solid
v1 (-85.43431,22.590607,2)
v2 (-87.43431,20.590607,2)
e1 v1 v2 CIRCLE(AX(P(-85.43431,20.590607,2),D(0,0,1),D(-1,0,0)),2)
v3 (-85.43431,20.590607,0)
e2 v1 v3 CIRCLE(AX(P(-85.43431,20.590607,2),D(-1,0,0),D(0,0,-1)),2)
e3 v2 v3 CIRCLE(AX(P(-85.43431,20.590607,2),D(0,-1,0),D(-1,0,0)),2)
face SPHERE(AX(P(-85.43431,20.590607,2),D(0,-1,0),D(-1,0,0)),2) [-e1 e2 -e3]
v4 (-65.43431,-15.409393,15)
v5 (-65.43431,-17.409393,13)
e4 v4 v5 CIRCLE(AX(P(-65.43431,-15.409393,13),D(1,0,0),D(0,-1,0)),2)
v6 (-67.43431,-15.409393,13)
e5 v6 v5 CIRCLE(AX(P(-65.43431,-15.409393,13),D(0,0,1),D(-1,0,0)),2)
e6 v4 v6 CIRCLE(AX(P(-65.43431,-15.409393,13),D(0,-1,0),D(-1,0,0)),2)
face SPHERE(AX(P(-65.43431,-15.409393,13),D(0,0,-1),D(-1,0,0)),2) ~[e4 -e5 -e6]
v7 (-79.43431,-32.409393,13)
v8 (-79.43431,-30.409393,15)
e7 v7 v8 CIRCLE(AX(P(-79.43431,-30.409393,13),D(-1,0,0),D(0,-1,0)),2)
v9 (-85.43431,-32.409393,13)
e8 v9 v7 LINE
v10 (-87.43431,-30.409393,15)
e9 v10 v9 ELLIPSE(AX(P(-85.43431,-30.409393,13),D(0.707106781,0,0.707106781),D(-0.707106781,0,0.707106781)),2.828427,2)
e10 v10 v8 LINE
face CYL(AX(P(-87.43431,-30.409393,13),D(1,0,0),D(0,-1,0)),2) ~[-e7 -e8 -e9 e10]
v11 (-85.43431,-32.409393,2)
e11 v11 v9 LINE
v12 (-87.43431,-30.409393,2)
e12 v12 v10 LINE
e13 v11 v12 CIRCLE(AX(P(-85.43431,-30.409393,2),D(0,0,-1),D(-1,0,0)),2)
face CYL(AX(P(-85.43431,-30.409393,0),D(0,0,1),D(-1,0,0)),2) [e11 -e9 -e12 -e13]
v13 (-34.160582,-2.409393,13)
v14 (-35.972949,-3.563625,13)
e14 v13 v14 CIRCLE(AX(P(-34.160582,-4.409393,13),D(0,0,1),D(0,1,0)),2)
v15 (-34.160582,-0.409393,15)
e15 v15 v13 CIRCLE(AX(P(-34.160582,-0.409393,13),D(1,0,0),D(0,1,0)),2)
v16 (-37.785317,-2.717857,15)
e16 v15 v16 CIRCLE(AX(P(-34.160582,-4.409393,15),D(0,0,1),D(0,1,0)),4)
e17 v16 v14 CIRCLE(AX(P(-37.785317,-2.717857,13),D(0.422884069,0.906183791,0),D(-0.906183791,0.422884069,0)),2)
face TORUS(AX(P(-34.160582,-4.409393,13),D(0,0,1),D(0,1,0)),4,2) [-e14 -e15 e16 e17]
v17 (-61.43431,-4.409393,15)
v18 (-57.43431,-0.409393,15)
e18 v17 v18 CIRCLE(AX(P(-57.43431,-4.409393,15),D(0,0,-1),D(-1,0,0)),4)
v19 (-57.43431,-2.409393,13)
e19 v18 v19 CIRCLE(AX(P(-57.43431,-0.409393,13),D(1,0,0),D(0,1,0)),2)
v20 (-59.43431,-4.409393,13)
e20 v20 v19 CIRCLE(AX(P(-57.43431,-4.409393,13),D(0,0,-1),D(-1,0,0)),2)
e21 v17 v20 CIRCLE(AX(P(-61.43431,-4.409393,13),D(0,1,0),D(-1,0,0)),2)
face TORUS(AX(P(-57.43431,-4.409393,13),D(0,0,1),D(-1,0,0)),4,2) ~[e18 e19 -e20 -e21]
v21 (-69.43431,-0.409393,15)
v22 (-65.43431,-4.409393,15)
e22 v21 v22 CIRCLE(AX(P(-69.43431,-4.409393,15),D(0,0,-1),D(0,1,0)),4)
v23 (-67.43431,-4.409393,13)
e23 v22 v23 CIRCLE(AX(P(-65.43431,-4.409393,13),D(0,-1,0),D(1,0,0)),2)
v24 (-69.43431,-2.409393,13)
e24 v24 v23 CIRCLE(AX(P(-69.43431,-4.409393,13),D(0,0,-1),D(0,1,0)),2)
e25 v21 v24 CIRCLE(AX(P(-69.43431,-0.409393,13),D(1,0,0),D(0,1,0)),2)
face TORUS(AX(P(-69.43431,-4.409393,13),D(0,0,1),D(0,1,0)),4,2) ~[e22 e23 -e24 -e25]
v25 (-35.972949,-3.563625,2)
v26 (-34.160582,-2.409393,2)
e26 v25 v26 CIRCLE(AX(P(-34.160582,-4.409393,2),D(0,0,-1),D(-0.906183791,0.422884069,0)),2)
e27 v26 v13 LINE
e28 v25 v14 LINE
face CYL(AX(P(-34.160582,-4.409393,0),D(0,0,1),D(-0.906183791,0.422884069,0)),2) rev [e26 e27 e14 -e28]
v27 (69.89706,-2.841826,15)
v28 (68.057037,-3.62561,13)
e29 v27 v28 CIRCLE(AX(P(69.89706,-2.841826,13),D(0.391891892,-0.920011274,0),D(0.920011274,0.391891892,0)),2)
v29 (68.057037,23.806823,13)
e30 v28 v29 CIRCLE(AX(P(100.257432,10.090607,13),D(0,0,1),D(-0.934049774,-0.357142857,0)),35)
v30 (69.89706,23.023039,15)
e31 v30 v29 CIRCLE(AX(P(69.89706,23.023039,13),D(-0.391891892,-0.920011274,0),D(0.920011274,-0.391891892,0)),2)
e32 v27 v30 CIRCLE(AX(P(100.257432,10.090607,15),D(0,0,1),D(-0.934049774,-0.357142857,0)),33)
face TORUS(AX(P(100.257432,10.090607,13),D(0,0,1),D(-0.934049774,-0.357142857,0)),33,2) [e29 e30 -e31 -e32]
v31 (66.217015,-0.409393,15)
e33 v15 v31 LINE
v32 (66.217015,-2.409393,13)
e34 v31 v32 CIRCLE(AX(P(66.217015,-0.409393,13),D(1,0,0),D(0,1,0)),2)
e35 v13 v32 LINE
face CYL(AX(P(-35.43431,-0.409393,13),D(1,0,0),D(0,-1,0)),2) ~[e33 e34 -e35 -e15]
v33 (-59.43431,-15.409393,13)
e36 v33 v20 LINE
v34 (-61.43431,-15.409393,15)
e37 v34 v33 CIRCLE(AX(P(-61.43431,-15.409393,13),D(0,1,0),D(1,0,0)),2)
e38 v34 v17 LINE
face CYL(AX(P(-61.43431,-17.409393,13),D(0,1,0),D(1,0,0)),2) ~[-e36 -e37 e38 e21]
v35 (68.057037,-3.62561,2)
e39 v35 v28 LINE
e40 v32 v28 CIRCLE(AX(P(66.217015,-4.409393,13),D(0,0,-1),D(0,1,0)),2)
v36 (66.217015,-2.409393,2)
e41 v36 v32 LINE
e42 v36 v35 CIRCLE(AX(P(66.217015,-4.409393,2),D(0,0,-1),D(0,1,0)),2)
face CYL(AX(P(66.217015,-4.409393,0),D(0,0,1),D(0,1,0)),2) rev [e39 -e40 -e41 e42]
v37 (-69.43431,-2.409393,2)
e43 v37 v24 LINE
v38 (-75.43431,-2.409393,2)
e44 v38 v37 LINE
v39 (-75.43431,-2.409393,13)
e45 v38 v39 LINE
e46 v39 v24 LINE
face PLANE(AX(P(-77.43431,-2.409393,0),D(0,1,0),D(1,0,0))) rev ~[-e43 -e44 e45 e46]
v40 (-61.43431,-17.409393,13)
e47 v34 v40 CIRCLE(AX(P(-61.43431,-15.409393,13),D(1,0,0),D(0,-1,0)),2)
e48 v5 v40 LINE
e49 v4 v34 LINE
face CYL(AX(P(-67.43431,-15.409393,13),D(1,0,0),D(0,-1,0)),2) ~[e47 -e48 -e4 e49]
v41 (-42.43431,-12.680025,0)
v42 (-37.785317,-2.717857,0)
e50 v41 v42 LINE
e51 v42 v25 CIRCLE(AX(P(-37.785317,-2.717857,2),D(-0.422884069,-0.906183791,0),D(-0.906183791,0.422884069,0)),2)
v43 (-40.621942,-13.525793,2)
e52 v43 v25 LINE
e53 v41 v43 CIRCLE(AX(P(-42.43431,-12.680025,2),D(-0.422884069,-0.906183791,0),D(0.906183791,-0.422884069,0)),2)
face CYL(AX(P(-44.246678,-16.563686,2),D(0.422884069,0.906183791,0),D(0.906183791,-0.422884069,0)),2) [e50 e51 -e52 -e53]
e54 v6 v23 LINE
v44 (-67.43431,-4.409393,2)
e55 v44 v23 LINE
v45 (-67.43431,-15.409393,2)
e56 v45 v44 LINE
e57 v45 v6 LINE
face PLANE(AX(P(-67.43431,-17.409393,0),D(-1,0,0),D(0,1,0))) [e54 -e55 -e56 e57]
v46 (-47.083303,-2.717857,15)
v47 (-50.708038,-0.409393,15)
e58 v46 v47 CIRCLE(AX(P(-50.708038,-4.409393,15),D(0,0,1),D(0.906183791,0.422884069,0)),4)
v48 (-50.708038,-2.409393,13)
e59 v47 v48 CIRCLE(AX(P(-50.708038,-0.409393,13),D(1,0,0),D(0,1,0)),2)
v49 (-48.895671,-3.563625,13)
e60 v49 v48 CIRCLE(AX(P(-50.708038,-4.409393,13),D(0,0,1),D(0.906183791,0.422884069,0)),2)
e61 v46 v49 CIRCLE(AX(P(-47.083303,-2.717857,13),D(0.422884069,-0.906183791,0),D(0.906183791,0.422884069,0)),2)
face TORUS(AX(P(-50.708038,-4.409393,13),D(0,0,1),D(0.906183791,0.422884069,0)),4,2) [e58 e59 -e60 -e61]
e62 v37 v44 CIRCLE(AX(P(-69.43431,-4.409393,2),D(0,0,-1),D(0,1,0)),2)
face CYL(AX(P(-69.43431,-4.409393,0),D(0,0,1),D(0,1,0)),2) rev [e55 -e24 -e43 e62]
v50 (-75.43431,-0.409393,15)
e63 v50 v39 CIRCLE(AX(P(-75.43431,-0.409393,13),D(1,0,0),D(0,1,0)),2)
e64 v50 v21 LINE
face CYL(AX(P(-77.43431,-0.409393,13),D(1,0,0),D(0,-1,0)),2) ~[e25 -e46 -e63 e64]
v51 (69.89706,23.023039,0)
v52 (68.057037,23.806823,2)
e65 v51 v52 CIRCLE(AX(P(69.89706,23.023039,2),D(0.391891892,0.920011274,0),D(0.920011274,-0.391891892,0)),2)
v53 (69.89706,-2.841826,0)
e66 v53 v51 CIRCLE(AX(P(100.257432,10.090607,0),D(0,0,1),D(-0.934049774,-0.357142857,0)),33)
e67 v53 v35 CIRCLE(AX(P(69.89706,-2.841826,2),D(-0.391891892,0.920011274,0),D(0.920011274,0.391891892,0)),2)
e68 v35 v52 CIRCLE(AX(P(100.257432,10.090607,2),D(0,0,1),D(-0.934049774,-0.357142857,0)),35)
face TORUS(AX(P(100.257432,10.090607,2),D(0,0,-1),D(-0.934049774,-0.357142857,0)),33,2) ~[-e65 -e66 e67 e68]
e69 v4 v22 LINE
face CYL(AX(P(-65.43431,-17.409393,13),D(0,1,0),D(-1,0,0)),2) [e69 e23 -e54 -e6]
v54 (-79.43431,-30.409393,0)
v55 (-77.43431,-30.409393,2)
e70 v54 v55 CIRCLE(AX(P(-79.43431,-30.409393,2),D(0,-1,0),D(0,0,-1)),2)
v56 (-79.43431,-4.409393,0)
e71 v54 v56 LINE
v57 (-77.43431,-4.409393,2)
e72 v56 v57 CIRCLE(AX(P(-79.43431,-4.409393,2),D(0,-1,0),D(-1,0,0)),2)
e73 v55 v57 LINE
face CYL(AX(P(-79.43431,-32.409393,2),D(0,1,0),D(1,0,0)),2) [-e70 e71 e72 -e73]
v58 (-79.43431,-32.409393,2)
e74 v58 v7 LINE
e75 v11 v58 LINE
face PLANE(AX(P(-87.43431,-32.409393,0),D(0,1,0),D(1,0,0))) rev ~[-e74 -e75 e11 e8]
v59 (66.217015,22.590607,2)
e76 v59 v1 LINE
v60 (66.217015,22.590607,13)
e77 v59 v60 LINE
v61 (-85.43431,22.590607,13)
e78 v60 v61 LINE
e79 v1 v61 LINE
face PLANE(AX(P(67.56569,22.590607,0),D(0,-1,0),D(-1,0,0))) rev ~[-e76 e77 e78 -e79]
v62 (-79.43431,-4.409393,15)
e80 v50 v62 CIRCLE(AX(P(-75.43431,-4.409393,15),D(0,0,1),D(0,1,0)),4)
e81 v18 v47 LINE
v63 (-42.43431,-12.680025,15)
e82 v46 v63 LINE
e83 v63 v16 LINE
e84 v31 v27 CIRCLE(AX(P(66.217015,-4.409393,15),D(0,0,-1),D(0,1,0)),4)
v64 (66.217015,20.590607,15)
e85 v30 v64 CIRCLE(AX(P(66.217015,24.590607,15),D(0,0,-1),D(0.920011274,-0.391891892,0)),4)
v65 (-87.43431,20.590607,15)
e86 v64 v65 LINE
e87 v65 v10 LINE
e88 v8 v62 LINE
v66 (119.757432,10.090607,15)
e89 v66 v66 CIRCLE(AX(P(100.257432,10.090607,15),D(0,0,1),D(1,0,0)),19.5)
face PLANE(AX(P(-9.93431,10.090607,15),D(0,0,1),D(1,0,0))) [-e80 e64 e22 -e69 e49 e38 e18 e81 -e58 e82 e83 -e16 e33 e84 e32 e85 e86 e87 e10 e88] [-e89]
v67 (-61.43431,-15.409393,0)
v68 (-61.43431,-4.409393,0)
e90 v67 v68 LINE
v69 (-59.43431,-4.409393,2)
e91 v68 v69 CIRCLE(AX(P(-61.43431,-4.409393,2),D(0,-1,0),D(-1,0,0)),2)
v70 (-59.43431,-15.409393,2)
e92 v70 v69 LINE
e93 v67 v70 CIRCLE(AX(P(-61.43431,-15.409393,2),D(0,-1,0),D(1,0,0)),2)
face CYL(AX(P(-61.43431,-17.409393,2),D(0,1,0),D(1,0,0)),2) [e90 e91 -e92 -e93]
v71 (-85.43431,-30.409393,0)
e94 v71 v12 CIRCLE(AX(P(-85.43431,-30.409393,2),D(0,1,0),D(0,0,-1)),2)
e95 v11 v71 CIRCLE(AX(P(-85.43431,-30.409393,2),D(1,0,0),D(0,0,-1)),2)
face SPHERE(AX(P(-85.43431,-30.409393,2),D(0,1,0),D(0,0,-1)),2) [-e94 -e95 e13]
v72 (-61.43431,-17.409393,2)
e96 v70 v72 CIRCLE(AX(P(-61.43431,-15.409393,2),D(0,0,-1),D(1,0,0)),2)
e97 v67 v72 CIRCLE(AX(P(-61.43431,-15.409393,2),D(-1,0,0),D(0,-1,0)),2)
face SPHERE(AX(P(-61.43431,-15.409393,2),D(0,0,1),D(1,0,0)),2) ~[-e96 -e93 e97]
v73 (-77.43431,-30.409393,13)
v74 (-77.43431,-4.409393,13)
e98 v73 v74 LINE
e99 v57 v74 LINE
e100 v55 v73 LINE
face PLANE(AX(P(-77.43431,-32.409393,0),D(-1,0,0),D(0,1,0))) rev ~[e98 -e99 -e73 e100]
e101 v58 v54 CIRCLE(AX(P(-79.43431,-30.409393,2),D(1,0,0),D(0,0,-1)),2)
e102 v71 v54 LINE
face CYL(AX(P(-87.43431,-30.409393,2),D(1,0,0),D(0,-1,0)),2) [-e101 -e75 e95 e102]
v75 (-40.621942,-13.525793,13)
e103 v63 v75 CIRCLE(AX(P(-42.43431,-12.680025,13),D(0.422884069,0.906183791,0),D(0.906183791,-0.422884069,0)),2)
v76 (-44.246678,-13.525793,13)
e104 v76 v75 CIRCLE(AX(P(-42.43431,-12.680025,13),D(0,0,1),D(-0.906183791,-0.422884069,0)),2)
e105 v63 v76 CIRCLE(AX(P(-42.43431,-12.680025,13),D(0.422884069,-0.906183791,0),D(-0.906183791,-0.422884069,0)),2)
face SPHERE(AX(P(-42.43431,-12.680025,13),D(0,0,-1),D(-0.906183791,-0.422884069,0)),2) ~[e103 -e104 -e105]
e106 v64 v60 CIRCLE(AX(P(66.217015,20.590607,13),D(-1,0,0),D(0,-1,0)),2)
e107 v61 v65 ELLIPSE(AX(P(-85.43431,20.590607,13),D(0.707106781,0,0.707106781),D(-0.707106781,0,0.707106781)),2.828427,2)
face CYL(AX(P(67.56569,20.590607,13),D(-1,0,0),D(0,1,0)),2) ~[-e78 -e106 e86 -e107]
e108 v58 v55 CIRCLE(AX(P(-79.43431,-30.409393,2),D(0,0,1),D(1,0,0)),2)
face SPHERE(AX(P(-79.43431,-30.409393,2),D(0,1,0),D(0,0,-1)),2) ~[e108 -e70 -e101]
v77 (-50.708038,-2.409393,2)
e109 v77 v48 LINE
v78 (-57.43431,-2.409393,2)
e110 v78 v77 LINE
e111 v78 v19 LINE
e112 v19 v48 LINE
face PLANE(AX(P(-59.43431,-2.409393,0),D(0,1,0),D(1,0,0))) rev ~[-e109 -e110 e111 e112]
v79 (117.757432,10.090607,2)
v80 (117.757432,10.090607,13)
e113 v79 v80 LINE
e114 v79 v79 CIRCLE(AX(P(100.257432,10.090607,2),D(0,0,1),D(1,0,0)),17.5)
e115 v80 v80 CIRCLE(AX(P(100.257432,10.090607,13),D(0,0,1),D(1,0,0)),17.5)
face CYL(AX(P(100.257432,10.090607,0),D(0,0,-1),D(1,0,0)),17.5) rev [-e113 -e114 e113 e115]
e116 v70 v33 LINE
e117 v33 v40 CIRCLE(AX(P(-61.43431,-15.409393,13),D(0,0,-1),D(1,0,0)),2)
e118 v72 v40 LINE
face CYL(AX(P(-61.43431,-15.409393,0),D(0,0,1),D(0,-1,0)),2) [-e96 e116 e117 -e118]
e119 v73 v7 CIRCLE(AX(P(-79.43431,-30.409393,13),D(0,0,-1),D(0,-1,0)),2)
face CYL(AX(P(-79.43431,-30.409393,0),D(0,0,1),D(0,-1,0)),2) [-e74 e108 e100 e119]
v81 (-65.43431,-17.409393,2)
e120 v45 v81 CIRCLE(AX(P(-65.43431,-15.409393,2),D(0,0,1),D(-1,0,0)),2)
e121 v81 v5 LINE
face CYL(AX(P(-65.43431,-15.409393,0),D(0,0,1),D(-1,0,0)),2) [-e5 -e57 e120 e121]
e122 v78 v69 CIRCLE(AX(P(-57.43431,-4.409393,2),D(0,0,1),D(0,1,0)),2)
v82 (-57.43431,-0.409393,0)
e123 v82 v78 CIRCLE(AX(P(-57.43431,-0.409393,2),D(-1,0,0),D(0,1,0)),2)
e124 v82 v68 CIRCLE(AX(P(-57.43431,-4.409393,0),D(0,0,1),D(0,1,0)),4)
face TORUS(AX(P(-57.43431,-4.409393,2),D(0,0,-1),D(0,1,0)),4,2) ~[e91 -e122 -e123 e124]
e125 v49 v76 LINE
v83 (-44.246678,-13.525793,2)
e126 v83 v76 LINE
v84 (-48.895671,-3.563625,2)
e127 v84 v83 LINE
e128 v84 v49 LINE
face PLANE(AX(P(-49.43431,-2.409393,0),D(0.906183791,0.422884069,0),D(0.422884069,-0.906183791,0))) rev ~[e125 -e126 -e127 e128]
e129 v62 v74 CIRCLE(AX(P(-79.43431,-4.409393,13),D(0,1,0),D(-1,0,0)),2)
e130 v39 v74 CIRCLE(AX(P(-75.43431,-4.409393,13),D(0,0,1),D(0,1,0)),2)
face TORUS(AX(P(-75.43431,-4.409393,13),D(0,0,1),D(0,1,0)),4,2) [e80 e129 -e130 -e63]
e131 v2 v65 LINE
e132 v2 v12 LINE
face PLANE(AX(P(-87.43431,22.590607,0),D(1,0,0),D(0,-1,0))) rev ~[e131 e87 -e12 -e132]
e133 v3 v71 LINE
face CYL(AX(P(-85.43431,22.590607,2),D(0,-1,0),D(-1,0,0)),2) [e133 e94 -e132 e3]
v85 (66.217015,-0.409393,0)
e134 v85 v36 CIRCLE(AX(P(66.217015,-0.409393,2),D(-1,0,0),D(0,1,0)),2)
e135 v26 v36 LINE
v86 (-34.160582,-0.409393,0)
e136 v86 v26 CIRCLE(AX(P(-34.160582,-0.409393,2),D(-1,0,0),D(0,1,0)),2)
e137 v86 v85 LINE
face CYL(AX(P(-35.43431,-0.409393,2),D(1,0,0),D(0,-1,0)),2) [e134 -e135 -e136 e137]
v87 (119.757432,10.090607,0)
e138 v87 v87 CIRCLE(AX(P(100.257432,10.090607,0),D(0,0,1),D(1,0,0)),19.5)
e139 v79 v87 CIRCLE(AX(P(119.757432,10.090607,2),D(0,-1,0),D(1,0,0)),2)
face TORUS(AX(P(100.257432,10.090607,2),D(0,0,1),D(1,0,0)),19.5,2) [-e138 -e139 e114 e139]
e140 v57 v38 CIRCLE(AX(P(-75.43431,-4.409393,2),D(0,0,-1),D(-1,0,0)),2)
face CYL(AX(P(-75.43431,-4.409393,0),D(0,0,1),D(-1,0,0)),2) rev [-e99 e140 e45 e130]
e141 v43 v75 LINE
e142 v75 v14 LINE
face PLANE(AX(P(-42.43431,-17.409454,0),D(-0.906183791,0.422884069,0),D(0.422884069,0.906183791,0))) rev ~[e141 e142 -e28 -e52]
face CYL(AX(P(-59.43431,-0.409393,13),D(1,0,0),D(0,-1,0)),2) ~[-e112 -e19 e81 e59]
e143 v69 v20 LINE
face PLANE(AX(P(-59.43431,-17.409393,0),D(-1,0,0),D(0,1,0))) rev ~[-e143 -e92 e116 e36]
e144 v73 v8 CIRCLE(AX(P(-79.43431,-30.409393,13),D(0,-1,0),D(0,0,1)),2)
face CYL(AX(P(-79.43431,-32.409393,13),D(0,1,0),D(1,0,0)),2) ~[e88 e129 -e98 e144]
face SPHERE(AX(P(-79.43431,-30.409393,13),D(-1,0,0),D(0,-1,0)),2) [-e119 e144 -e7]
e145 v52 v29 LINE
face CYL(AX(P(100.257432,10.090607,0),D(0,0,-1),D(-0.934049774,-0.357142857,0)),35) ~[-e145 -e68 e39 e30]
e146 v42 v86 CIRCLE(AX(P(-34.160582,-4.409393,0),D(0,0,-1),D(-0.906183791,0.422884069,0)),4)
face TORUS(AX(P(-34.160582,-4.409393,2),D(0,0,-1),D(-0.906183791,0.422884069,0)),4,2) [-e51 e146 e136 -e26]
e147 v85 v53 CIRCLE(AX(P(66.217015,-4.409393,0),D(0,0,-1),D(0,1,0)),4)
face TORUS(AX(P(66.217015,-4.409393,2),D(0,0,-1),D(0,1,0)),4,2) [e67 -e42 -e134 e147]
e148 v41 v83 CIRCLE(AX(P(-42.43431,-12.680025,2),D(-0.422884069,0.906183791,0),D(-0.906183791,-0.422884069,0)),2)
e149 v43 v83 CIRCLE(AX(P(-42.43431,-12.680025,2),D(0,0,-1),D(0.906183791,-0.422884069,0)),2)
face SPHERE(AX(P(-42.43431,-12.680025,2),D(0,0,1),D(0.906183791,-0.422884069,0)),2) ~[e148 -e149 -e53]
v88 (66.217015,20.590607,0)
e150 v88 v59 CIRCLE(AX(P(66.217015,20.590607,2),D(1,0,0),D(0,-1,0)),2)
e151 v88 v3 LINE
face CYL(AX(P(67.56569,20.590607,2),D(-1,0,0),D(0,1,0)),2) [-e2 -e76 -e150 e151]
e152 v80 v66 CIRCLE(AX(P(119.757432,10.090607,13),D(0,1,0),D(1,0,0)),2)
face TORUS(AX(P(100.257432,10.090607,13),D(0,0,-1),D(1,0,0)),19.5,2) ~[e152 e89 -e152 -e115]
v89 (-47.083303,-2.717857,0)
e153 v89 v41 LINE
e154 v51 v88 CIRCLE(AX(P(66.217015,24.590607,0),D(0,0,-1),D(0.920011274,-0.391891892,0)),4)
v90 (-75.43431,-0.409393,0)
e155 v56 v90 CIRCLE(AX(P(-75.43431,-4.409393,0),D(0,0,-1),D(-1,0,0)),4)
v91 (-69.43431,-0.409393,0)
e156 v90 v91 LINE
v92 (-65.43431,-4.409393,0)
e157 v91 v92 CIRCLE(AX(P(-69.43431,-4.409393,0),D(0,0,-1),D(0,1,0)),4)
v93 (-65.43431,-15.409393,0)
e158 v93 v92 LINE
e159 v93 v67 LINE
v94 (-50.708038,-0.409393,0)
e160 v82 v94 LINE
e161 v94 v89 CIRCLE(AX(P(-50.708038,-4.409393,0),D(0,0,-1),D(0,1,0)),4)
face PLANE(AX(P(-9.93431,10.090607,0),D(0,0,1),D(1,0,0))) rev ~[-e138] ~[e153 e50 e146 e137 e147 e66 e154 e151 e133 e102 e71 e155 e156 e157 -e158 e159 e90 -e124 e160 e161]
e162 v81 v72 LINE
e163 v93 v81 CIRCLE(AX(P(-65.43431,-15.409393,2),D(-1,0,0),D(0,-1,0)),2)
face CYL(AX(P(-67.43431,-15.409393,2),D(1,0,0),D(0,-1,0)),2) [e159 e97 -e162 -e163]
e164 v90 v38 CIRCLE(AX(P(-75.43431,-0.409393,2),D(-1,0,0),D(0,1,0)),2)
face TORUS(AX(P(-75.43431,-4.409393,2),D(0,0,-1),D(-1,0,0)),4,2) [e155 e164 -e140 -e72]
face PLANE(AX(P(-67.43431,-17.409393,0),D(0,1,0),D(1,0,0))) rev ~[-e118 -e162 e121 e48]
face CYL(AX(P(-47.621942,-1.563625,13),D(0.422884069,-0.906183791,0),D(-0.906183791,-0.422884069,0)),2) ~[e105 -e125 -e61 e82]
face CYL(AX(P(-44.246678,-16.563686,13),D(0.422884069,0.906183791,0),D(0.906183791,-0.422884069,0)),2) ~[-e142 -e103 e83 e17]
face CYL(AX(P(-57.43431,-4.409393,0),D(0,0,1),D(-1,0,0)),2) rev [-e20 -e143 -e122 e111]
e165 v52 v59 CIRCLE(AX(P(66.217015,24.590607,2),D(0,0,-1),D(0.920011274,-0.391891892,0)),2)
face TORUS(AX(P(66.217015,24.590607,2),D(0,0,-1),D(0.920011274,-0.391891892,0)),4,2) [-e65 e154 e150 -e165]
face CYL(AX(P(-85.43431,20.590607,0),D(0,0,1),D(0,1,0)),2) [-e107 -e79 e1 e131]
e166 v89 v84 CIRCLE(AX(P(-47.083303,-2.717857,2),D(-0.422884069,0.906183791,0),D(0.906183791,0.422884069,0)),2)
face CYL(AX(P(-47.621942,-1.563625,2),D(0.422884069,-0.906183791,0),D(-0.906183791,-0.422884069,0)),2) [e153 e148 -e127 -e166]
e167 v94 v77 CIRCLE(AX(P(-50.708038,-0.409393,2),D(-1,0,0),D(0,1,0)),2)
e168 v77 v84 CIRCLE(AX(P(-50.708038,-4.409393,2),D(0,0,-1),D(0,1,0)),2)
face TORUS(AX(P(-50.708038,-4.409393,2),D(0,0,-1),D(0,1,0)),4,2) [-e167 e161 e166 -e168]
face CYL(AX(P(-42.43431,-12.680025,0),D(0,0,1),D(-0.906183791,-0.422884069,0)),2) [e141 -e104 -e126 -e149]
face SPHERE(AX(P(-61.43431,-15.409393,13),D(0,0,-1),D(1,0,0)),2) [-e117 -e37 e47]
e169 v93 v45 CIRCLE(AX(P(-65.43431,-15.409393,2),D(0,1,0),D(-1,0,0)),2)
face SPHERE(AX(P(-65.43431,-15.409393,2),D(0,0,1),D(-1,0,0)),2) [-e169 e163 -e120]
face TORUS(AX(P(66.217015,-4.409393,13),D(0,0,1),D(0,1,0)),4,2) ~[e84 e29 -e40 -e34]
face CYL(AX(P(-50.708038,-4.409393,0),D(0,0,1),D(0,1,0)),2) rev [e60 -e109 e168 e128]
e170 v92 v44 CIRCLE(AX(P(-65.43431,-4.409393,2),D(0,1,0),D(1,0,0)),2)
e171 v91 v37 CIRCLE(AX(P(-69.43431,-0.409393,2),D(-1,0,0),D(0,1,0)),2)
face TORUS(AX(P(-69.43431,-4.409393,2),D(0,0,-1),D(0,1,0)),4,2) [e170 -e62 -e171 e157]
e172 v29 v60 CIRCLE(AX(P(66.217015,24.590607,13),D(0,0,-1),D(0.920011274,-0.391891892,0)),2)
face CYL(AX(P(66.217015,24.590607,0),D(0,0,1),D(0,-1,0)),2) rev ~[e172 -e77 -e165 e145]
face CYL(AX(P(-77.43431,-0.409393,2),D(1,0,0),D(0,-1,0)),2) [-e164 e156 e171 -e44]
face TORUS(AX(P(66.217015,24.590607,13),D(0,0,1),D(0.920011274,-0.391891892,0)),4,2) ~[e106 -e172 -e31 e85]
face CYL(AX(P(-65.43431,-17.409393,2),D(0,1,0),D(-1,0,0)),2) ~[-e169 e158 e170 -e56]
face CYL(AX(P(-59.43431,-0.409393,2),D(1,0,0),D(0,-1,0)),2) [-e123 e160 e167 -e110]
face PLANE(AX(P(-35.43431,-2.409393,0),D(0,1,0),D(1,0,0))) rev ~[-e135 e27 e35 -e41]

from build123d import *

# Parameters (mm, degrees)
F0_R     = 17.5
F0_W     = 10
F0_H     = 30
F0_W_2   = 8
F0_H_2   = 15
F1_DEPTH = 15
F2_R     = 2


with BuildPart() as f1:
    # F0 (on Top) → F1 (new body)
    with BuildSketch(Plane.XY):
        Polygon((67.5656899738, 22.5906066601), (-87.4343100262, 22.5906066601), (-87.4343100262, -2.4093933399), (-77.4343100262, -2.4093933399), (-67.4343100262, -2.4093933399), (-59.4343100262, -2.4093933399), (-49.4343100262, -2.4093933399), (-35.4343100262, -2.4093933399), (67.5656899738, -2.4093933399), align=None)
        with BuildLine():
            ThreePointArc((67.5656899738, -2.4093933399), (135.2574320504, 10.0906066601), (67.5656899738, 22.5906066601))
            Line((67.5656899738, 22.5906066601), (67.5656899738, -2.4093933399))
        make_face()
        with Locations((100.2574320504, 10.0906066601)):
            Circle(F0_R, mode=Mode.SUBTRACT)
        with Locations((-82.4343100262, -17.4093933399)):
            Rectangle(F0_W, F0_H)
        Polygon((-42.4343100262, -17.4094536398), (-35.4343100262, -2.4093933399), (-49.4343100262, -2.4093933399), align=None)
        with Locations((-63.4343100262, -9.9093933399)):
            Rectangle(F0_W_2, F0_H_2)
    extrude(amount=F1_DEPTH)

    # F2
    f2_edges = [f1.edges().sort_by_distance(p)[0] for p in [
        (-35.43431, -2.409393, 7.5),
        (-45.93431, -9.909423, 0),
        (-59.43431, -17.409393, 7.5),
        (-49.43431, -2.409393, 7.5),
        (-67.43431, -17.409393, 7.5),
        (-42.43431, -17.409454, 7.5),
        (-45.93431, -9.909423, 15),
        (-38.93431, -9.909423, 0),
        (-87.43431, -4.909393, 0),
        (135.257432, 10.090607, 0),
        (135.257432, 10.090607, 15),
        (82.757432, 10.090607, 0),
        (82.757432, 10.090607, 15),
        (-77.43431, -17.409393, 0),
        (-87.43431, 22.590607, 7.5),
        (-72.43431, -2.409393, 0),
        (-59.43431, -2.409393, 7.5),
        (67.56569, -2.409393, 7.5),
        (-54.43431, -2.409393, 0),
        (-9.93431, 22.590607, 0),
        (-9.93431, 22.590607, 15),
        (67.56569, 22.590607, 7.5),
        (-77.43431, -2.409393, 7.5),
        (-59.43431, -9.909393, 15),
        (-72.43431, -2.409393, 15),
        (-54.43431, -2.409393, 15),
        (-67.43431, -9.909393, 0),
        (-67.43431, -9.909393, 15),
        (-59.43431, -9.909393, 0),
        (16.06569, -2.409393, 0),
        (16.06569, -2.409393, 15),
        (-38.93431, -9.909423, 15),
        (-82.43431, -32.409393, 0),
        (-63.43431, -17.409393, 0),
        (-63.43431, -17.409393, 15),
        (-67.43431, -2.409393, 7.5),
        (-87.43431, -32.409393, 7.5),
        (-82.43431, -32.409393, 15),
        (-77.43431, -32.409393, 7.5),
        (-77.43431, -17.409393, 15),
    ]]
    fillet(f2_edges, radius=F2_R)


solid = f1.part
